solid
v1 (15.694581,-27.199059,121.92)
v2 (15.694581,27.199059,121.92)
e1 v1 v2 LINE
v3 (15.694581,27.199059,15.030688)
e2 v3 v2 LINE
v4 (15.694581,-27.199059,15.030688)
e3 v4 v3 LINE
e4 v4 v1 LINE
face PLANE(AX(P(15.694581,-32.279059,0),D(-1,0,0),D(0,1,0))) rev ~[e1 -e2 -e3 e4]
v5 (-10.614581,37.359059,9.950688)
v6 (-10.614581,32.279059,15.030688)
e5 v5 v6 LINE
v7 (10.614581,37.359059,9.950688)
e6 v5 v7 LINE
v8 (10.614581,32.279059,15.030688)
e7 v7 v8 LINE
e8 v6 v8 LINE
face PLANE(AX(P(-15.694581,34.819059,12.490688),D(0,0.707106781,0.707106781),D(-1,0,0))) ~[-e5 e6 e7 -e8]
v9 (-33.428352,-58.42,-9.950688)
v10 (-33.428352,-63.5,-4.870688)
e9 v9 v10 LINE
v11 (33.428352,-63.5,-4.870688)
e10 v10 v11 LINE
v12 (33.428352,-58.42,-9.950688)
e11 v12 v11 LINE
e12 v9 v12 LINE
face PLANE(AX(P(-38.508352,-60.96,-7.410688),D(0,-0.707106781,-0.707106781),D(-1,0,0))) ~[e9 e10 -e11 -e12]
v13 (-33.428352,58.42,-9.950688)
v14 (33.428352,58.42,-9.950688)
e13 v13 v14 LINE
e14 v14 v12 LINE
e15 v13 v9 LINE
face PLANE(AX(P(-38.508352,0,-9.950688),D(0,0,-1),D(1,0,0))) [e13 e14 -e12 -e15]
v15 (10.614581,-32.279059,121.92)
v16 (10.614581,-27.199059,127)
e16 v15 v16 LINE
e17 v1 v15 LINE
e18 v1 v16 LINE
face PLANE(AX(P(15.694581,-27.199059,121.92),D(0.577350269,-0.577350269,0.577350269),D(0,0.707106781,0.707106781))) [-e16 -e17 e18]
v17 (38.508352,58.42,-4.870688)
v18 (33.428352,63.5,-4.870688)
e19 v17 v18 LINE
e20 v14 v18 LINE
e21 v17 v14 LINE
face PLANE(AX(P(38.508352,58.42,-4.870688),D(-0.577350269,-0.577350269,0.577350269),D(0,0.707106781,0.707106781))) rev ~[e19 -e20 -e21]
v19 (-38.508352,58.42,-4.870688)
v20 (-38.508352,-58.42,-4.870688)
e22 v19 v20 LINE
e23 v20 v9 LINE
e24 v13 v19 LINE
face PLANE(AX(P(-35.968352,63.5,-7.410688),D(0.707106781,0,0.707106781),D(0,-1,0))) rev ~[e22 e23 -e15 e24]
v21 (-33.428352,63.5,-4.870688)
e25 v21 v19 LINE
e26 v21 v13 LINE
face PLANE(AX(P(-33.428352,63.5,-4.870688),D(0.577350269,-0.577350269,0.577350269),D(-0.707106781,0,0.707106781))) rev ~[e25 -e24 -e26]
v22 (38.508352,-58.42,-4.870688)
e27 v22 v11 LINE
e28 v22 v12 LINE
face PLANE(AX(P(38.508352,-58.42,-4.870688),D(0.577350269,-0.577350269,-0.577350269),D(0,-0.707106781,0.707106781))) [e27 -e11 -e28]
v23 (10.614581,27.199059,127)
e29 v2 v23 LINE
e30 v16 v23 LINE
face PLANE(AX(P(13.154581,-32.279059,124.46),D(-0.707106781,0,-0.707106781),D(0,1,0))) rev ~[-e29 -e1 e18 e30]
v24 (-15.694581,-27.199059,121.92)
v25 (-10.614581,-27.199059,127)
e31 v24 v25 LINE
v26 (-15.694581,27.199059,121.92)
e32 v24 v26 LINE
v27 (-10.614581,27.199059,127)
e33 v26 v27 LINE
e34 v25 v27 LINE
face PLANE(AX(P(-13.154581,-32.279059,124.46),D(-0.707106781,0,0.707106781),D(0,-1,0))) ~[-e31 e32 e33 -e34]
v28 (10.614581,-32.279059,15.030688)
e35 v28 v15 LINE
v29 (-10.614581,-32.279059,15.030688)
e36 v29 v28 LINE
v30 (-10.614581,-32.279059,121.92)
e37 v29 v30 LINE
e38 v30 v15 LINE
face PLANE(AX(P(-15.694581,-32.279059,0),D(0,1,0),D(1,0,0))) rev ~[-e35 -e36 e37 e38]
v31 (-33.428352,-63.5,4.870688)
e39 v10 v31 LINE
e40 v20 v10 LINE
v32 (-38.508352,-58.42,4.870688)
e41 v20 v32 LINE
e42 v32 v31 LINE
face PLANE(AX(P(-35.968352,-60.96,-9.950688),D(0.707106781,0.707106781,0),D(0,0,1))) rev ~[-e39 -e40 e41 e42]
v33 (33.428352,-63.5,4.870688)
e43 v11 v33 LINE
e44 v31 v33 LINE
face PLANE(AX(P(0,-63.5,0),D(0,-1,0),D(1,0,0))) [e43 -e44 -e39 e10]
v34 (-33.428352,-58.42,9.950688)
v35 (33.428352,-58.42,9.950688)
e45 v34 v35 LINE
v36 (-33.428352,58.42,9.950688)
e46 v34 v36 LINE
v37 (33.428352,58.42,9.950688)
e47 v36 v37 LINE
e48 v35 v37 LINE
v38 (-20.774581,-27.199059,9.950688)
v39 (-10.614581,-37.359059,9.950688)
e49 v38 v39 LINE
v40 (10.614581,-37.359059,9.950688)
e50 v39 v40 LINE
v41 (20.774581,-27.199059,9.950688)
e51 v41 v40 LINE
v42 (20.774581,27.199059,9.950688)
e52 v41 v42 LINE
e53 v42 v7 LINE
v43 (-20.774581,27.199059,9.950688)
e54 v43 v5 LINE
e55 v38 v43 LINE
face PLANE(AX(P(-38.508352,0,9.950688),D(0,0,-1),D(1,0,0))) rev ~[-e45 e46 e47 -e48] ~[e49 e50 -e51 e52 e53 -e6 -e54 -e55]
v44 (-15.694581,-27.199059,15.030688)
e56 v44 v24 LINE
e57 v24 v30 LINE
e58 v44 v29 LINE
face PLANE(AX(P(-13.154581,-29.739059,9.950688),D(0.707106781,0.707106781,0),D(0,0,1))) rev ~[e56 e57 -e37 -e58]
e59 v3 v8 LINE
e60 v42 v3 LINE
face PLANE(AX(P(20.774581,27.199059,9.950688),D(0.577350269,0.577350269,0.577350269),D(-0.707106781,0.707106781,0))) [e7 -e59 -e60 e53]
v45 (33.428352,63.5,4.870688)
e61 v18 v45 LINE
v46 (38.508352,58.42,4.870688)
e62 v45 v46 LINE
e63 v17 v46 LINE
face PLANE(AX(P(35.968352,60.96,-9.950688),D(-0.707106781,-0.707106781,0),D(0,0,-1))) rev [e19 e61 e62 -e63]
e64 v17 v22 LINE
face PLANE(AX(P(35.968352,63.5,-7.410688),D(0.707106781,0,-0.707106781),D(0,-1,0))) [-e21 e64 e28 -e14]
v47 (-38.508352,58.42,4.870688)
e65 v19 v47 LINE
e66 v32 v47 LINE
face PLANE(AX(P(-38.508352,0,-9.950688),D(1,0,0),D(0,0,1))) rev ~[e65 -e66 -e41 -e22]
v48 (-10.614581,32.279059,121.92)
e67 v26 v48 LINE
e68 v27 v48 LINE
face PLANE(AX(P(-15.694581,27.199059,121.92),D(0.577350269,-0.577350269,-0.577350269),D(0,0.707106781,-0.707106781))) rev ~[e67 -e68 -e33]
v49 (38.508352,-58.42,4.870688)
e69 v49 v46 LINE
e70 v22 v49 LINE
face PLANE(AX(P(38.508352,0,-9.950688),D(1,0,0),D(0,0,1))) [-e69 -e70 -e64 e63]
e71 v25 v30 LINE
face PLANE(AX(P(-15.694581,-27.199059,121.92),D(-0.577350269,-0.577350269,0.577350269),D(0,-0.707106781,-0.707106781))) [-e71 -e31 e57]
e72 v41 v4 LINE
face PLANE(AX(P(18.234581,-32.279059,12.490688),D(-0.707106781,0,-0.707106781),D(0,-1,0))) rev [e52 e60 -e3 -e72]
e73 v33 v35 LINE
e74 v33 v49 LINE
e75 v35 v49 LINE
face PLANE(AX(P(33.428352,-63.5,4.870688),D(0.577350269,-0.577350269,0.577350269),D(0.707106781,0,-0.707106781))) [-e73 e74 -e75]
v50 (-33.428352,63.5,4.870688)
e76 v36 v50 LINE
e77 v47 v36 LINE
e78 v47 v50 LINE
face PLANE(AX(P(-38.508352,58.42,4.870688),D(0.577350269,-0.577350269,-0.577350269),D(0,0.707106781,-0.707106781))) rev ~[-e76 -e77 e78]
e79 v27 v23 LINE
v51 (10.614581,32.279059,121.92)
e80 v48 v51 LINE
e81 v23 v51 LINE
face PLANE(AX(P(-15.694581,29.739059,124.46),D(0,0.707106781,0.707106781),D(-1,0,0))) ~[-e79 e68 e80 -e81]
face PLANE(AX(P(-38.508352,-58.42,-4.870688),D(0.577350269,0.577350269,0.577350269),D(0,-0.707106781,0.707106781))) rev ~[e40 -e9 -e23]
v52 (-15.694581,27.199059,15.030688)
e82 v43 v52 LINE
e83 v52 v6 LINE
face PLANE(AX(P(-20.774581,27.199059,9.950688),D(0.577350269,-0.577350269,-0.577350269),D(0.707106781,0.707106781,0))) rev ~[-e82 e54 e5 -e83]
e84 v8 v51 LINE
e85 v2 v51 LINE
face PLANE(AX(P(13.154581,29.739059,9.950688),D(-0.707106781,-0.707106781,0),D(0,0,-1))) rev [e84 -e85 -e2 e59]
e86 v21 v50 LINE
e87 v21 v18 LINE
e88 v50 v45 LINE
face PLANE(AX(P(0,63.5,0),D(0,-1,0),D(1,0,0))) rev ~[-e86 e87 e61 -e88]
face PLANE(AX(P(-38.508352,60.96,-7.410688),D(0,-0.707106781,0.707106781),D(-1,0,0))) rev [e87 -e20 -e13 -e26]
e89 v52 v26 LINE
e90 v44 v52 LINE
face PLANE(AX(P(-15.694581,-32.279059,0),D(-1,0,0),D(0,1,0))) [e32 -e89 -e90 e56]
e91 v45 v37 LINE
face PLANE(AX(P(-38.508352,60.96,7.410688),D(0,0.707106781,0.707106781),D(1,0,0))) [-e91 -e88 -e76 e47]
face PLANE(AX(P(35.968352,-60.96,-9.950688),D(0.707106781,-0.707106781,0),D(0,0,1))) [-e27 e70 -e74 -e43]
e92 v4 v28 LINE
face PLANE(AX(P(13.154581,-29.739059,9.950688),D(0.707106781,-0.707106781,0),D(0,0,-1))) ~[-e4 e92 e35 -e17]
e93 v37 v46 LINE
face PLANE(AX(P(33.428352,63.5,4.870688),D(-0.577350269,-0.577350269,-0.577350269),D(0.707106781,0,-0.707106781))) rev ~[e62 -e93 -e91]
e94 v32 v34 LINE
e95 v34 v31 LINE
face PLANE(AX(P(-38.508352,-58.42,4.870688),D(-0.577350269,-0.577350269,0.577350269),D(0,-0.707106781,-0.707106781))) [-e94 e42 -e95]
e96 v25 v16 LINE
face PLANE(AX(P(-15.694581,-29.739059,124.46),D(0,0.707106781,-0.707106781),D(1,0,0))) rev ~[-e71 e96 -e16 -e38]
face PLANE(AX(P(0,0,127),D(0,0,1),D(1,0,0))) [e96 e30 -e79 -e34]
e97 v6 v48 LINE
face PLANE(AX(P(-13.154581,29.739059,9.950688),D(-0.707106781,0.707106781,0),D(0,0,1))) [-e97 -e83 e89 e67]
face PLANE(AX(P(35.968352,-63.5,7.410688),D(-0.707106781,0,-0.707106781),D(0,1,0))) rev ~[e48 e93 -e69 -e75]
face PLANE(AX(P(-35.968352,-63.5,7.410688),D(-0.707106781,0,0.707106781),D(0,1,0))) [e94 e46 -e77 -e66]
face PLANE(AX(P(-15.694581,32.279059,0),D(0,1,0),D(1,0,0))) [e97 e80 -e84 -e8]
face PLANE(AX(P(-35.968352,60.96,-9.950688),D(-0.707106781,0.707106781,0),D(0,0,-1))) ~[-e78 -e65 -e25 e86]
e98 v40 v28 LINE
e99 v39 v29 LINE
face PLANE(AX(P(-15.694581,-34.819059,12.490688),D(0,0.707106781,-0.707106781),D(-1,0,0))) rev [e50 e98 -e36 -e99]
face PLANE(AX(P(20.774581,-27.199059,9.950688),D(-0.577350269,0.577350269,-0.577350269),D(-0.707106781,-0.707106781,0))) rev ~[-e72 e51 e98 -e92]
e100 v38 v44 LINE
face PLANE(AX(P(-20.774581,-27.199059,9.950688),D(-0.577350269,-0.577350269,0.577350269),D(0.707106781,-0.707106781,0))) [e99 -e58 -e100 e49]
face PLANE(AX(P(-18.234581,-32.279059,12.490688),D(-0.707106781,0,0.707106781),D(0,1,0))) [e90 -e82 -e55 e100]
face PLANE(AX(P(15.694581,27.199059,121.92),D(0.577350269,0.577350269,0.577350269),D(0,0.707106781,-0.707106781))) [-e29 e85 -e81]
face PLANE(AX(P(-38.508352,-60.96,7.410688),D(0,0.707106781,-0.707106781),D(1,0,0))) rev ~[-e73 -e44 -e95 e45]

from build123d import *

# Parameters (mm, degrees)
F0_W     = 77.0167037845
F0_H     = 19.9013762176
F1_DEPTH = 63.5
F2_W     = 31.3891619444
F2_H     = 64.5581185818
F3_DEPTH = 127
F4_SIZE2 = 5.08
F4_SIZE  = 5.08


# Not quite as in the source:
# - the program builds the solid bodies; features that only make, move or delete a surface that nothing else refers to are left out


with BuildPart() as f1:
    # F0 (on Front) → F1 (new body, symmetric)
    with BuildSketch(Plane.XZ):
        Rectangle(F0_W, F0_H)
    extrude(amount=F1_DEPTH, both=True)

    # F2 (on Top) → F3 (join)
    with BuildSketch(Plane.XY):
        Rectangle(F2_W, F2_H)
    extrude(amount=F3_DEPTH)

    # F4
    f4_edges = [f1.edges().sort_by_distance(p)[0] for p in [
        (0, -32.279059, 127),
        (15.694581, -32.279059, 68.475344),
        (0, 32.279059, 127),
        (15.694581, 0, 127),
        (-15.694581, 0, 127),
        (15.694581, 32.279059, 68.475344),
        (-15.694581, 32.279059, 68.475344),
        (-15.694581, -32.279059, 68.475344),
        (15.694581, 0, 9.950688),
        (38.508352, 0, 9.950688),
        (0, -63.5, 9.950688),
        (0, 63.5, 9.950688),
        (-38.508352, 0, 9.950688),
        (0, -63.5, -9.950688),
        (-38.508352, 0, -9.950688),
        (0, 63.5, -9.950688),
        (38.508352, 0, -9.950688),
        (38.508352, 63.5, 0),
        (-38.508352, 63.5, 0),
        (38.508352, -63.5, 0),
        (-38.508352, -63.5, 0),
        (-15.694581, 0, 9.950688),
        (0, -32.279059, 9.950688),
        (0, 32.279059, 9.950688),
    ]]
    chamfer(f4_edges, length=F4_SIZE, length2=F4_SIZE2)


solid = f1.part
